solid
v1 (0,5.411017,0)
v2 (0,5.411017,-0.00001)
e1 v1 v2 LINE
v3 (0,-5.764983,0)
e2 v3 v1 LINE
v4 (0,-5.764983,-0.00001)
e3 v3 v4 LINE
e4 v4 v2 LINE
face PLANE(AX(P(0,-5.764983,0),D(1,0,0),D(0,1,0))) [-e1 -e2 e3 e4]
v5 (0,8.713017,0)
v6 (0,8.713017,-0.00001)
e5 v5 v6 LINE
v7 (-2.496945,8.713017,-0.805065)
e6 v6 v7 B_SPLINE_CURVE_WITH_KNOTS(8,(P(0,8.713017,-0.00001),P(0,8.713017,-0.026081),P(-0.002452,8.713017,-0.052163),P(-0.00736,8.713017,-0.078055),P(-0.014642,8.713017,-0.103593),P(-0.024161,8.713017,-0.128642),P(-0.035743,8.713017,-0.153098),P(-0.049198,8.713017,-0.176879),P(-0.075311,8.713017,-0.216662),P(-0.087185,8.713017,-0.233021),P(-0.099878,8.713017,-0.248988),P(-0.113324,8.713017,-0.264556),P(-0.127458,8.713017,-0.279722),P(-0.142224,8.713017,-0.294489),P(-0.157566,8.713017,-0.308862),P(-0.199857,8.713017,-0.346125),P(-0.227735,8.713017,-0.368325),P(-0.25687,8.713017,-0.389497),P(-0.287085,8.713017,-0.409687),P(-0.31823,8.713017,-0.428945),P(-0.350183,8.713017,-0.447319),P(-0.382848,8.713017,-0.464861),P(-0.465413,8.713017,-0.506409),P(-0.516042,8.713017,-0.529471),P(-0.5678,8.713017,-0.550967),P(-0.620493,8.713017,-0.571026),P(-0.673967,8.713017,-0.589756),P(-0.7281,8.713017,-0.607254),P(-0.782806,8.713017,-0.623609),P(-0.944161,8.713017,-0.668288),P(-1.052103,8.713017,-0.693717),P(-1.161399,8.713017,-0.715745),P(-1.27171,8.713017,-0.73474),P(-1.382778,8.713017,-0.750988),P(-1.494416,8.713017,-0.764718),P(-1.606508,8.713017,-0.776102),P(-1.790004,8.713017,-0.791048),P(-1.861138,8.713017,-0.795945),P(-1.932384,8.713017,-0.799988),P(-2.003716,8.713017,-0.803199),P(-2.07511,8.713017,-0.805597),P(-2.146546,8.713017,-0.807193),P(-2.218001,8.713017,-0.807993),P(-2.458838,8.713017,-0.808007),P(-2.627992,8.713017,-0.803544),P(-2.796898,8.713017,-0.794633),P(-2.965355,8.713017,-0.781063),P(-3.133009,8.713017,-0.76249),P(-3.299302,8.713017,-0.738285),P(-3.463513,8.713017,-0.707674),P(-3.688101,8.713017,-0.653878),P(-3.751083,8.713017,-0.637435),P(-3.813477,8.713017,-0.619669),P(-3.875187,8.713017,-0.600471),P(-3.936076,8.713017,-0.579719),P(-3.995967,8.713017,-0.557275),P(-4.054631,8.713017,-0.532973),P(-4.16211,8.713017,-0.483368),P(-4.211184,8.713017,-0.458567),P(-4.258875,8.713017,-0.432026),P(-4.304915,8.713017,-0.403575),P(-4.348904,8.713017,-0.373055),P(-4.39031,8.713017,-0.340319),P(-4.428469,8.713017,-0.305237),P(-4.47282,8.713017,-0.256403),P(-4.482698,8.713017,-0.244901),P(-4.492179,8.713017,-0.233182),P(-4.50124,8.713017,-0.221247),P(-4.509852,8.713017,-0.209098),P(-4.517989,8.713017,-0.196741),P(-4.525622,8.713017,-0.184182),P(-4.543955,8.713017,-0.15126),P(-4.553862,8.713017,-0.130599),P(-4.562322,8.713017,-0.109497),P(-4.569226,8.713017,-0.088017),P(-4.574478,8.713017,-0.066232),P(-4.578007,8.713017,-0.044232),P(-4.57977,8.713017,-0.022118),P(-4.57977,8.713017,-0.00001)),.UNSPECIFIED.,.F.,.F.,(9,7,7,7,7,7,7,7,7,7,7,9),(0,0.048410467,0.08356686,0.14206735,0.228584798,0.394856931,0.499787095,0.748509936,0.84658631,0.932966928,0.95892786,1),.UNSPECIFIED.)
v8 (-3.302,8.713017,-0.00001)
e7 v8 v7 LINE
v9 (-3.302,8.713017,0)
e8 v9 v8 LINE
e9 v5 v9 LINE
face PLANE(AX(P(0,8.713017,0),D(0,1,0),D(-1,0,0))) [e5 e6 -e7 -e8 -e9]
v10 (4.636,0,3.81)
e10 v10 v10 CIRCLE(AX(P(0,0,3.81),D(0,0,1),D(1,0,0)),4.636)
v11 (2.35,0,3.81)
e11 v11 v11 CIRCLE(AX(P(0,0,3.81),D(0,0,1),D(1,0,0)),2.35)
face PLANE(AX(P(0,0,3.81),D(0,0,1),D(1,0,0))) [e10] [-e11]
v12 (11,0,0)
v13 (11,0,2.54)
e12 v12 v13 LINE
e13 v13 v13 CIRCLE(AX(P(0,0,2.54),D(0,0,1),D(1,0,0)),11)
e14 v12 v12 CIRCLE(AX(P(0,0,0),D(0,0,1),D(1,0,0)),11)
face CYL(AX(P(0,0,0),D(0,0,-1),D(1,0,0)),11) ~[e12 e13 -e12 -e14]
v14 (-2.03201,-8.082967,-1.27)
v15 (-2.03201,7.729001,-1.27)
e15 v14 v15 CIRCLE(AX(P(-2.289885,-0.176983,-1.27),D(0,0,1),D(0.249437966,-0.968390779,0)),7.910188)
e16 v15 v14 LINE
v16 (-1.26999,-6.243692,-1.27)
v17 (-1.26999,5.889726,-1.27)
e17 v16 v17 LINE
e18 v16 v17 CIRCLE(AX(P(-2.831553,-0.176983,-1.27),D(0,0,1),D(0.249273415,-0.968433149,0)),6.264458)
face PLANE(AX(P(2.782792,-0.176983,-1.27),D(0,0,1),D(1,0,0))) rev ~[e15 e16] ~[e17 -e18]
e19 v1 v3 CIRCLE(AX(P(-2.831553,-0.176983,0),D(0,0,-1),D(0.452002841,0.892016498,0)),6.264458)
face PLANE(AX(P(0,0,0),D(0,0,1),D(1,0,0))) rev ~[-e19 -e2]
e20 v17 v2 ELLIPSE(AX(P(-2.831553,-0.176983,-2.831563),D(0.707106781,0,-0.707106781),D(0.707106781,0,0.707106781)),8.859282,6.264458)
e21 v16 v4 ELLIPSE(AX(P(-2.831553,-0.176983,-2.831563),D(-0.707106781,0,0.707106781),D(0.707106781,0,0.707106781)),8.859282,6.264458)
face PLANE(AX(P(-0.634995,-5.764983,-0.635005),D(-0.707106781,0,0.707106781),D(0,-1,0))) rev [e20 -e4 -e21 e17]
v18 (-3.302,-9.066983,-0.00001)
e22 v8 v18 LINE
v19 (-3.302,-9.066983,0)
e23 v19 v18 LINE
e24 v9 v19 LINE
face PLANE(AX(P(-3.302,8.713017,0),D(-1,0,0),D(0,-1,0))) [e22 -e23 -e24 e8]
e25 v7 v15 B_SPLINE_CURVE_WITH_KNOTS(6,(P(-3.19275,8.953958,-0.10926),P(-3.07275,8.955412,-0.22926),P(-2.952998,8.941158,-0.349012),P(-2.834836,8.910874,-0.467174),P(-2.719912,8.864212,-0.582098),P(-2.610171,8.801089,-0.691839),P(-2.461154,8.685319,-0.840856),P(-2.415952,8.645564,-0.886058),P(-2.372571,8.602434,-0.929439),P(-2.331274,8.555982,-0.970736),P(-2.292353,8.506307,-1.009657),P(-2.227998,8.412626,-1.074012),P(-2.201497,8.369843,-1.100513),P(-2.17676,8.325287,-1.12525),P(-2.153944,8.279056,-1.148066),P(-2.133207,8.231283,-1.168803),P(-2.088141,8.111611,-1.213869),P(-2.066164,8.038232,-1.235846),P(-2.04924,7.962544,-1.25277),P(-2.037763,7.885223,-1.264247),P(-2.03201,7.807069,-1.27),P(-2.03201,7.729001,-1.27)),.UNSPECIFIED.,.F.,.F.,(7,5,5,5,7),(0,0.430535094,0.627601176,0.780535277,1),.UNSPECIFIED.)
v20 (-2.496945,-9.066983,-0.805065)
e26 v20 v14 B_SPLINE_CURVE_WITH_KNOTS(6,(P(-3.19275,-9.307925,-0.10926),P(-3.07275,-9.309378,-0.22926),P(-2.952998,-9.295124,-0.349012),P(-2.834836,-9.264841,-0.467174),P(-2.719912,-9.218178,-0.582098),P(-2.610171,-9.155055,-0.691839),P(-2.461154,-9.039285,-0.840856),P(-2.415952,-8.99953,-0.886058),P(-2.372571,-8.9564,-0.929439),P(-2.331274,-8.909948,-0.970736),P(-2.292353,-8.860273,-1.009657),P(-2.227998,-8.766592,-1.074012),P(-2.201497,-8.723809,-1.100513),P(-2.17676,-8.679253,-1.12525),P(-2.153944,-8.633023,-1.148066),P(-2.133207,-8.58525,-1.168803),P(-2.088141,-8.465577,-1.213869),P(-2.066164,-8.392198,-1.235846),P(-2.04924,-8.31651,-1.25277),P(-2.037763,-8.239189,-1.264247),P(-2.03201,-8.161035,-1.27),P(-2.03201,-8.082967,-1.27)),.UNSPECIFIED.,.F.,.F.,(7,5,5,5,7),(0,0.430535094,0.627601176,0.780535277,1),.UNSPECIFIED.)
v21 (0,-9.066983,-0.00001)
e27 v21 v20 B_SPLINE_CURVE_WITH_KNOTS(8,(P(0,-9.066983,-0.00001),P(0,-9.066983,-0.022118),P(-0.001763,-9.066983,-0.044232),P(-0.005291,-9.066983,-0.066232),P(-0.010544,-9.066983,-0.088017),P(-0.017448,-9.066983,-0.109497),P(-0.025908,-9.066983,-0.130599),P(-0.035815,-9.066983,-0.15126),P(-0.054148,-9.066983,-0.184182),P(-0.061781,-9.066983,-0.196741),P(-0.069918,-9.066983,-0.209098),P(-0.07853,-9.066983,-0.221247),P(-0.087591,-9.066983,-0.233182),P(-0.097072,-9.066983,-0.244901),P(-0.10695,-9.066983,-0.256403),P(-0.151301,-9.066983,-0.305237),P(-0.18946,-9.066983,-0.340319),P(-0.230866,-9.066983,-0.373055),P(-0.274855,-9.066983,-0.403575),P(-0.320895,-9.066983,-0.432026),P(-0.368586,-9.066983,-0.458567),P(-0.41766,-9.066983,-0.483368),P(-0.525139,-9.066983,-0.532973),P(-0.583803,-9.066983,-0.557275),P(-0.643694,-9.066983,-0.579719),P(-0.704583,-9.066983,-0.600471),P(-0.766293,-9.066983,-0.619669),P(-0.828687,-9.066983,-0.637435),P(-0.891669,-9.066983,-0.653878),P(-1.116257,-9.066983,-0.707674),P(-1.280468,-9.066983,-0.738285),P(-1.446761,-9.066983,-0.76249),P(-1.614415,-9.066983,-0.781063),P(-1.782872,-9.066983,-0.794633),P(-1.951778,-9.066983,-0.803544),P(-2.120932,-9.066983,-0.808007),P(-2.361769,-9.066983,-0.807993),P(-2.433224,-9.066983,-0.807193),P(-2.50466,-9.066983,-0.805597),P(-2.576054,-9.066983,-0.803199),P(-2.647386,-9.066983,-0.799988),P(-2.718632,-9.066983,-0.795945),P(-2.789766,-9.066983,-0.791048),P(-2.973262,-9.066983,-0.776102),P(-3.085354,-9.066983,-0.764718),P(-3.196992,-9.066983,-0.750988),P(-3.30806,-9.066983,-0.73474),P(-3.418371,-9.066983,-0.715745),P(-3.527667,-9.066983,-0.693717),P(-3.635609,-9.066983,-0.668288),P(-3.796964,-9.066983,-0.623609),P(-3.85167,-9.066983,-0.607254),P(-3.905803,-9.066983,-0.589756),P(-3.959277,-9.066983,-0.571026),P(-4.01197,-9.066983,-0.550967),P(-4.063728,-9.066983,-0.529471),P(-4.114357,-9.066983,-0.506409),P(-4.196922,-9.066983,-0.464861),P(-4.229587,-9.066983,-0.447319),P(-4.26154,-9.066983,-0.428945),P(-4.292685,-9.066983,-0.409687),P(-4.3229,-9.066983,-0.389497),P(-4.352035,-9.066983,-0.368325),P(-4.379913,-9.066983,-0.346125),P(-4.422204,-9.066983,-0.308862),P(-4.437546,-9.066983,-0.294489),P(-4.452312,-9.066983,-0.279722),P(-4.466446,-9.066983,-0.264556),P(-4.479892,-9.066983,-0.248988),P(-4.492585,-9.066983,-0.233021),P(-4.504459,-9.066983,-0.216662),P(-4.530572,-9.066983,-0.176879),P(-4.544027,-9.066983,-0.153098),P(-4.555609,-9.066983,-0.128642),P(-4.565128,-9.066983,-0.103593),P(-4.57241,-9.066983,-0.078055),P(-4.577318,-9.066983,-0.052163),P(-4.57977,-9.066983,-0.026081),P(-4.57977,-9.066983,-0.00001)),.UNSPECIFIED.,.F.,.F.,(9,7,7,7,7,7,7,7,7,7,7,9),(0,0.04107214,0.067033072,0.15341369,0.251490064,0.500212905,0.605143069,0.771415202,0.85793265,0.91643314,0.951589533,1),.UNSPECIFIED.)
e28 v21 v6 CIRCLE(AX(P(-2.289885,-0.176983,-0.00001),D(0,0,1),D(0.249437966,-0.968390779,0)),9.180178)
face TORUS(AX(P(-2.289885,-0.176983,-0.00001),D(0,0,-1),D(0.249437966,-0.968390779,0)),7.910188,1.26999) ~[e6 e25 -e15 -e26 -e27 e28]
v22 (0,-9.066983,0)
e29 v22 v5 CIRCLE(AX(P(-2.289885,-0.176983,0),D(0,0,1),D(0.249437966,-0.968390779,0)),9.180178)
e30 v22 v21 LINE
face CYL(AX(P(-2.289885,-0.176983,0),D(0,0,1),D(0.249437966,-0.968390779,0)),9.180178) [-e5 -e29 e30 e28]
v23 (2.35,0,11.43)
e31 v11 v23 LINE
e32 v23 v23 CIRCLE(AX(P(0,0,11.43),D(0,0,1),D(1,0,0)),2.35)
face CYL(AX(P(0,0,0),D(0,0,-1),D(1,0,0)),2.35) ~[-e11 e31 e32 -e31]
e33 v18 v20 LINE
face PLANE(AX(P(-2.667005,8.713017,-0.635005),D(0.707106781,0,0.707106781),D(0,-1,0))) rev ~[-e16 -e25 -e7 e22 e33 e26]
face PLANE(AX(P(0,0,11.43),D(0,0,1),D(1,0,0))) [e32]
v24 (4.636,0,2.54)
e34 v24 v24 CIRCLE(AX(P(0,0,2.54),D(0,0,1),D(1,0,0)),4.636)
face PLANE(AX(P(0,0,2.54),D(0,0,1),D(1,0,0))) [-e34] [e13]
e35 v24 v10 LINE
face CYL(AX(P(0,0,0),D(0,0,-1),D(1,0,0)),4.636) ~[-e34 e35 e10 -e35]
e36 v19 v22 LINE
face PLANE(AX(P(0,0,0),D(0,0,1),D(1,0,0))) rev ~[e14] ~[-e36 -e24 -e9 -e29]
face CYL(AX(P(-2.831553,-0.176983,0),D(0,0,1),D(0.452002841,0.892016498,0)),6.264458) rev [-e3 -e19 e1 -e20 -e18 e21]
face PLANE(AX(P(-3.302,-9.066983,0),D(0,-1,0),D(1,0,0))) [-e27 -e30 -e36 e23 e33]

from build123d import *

# Parameters (mm, degrees)
F0_R     = 2.35
F1_DEPTH = 11.43
F0_R_2   = 4.636
F2_DEPTH = 3.81
F0_R_3   = 11
F3_DEPTH = 2.54
F5_DEPTH = 1.27
F6_SIZE  = 1.26999
F7_R     = 1.26999


# Not quite as in the source:
# - a fillet or chamfer is up to 0.001 mm smaller than in the source, because OpenCascade refuses the exact size


with BuildPart() as f1:
    # F0 (on Top) → F1 (new body)
    with BuildSketch(Plane.XY):
        Circle(F0_R)
    extrude(amount=F1_DEPTH)

    # F0 (on Top) → F2 (join)
    with BuildSketch(Plane.XY):
        Circle(F0_R_2)
        Circle(F0_R, mode=Mode.SUBTRACT)
    extrude(amount=F2_DEPTH)

    # F0 (on Top) → F3 (join)
    with BuildSketch(Plane.XY):
        Circle(F0_R_3)
        Circle(F0_R_2, mode=Mode.SUBTRACT)
    extrude(amount=F3_DEPTH)

    # F4 (on face) → F5 (join)
    with BuildSketch(Plane.XY):
        with BuildLine():
            ThreePointArc((0, 5.4110168739), (3.4329052601, -0.1769831261), (0, -5.7649831261))
            Line((0, -5.7649831261), (0, -9.0669831261))
            ThreePointArc((0, -9.0669831261), (6.8902932862, -0.1769831261), (0, 8.7130168739))
            Line((0, 8.7130168739), (0, 5.4110168739))
        make_face()
        Polygon((0, -9.0669831261), (0, -5.7649831261), (0, 5.4110168739), (0, 8.7130168739), (-3.302, 8.7130168739), (-3.302, -9.0669831261), align=None)
    extrude(amount=-F5_DEPTH)

    # F6 (size 1.27 in the source; OpenCascade refuses exactly that, so slightly less here)
    f6_edges = [f1.edges().sort_by_distance(p)[0] for p in [
        (-3.302, -0.176983, -1.27),
        (0, -0.176983, -1.27),
    ]]
    chamfer(f6_edges, length=F6_SIZE)

    # F7 (radius 1.27 in the source; OpenCascade refuses exactly that, so slightly less here)
    f7_edges = [f1.edges().sort_by_distance(p)[0] for p in [
        (6.890293, -0.176983, -1.27),
    ]]
    fillet(f7_edges, radius=F7_R)


solid = f1.part
